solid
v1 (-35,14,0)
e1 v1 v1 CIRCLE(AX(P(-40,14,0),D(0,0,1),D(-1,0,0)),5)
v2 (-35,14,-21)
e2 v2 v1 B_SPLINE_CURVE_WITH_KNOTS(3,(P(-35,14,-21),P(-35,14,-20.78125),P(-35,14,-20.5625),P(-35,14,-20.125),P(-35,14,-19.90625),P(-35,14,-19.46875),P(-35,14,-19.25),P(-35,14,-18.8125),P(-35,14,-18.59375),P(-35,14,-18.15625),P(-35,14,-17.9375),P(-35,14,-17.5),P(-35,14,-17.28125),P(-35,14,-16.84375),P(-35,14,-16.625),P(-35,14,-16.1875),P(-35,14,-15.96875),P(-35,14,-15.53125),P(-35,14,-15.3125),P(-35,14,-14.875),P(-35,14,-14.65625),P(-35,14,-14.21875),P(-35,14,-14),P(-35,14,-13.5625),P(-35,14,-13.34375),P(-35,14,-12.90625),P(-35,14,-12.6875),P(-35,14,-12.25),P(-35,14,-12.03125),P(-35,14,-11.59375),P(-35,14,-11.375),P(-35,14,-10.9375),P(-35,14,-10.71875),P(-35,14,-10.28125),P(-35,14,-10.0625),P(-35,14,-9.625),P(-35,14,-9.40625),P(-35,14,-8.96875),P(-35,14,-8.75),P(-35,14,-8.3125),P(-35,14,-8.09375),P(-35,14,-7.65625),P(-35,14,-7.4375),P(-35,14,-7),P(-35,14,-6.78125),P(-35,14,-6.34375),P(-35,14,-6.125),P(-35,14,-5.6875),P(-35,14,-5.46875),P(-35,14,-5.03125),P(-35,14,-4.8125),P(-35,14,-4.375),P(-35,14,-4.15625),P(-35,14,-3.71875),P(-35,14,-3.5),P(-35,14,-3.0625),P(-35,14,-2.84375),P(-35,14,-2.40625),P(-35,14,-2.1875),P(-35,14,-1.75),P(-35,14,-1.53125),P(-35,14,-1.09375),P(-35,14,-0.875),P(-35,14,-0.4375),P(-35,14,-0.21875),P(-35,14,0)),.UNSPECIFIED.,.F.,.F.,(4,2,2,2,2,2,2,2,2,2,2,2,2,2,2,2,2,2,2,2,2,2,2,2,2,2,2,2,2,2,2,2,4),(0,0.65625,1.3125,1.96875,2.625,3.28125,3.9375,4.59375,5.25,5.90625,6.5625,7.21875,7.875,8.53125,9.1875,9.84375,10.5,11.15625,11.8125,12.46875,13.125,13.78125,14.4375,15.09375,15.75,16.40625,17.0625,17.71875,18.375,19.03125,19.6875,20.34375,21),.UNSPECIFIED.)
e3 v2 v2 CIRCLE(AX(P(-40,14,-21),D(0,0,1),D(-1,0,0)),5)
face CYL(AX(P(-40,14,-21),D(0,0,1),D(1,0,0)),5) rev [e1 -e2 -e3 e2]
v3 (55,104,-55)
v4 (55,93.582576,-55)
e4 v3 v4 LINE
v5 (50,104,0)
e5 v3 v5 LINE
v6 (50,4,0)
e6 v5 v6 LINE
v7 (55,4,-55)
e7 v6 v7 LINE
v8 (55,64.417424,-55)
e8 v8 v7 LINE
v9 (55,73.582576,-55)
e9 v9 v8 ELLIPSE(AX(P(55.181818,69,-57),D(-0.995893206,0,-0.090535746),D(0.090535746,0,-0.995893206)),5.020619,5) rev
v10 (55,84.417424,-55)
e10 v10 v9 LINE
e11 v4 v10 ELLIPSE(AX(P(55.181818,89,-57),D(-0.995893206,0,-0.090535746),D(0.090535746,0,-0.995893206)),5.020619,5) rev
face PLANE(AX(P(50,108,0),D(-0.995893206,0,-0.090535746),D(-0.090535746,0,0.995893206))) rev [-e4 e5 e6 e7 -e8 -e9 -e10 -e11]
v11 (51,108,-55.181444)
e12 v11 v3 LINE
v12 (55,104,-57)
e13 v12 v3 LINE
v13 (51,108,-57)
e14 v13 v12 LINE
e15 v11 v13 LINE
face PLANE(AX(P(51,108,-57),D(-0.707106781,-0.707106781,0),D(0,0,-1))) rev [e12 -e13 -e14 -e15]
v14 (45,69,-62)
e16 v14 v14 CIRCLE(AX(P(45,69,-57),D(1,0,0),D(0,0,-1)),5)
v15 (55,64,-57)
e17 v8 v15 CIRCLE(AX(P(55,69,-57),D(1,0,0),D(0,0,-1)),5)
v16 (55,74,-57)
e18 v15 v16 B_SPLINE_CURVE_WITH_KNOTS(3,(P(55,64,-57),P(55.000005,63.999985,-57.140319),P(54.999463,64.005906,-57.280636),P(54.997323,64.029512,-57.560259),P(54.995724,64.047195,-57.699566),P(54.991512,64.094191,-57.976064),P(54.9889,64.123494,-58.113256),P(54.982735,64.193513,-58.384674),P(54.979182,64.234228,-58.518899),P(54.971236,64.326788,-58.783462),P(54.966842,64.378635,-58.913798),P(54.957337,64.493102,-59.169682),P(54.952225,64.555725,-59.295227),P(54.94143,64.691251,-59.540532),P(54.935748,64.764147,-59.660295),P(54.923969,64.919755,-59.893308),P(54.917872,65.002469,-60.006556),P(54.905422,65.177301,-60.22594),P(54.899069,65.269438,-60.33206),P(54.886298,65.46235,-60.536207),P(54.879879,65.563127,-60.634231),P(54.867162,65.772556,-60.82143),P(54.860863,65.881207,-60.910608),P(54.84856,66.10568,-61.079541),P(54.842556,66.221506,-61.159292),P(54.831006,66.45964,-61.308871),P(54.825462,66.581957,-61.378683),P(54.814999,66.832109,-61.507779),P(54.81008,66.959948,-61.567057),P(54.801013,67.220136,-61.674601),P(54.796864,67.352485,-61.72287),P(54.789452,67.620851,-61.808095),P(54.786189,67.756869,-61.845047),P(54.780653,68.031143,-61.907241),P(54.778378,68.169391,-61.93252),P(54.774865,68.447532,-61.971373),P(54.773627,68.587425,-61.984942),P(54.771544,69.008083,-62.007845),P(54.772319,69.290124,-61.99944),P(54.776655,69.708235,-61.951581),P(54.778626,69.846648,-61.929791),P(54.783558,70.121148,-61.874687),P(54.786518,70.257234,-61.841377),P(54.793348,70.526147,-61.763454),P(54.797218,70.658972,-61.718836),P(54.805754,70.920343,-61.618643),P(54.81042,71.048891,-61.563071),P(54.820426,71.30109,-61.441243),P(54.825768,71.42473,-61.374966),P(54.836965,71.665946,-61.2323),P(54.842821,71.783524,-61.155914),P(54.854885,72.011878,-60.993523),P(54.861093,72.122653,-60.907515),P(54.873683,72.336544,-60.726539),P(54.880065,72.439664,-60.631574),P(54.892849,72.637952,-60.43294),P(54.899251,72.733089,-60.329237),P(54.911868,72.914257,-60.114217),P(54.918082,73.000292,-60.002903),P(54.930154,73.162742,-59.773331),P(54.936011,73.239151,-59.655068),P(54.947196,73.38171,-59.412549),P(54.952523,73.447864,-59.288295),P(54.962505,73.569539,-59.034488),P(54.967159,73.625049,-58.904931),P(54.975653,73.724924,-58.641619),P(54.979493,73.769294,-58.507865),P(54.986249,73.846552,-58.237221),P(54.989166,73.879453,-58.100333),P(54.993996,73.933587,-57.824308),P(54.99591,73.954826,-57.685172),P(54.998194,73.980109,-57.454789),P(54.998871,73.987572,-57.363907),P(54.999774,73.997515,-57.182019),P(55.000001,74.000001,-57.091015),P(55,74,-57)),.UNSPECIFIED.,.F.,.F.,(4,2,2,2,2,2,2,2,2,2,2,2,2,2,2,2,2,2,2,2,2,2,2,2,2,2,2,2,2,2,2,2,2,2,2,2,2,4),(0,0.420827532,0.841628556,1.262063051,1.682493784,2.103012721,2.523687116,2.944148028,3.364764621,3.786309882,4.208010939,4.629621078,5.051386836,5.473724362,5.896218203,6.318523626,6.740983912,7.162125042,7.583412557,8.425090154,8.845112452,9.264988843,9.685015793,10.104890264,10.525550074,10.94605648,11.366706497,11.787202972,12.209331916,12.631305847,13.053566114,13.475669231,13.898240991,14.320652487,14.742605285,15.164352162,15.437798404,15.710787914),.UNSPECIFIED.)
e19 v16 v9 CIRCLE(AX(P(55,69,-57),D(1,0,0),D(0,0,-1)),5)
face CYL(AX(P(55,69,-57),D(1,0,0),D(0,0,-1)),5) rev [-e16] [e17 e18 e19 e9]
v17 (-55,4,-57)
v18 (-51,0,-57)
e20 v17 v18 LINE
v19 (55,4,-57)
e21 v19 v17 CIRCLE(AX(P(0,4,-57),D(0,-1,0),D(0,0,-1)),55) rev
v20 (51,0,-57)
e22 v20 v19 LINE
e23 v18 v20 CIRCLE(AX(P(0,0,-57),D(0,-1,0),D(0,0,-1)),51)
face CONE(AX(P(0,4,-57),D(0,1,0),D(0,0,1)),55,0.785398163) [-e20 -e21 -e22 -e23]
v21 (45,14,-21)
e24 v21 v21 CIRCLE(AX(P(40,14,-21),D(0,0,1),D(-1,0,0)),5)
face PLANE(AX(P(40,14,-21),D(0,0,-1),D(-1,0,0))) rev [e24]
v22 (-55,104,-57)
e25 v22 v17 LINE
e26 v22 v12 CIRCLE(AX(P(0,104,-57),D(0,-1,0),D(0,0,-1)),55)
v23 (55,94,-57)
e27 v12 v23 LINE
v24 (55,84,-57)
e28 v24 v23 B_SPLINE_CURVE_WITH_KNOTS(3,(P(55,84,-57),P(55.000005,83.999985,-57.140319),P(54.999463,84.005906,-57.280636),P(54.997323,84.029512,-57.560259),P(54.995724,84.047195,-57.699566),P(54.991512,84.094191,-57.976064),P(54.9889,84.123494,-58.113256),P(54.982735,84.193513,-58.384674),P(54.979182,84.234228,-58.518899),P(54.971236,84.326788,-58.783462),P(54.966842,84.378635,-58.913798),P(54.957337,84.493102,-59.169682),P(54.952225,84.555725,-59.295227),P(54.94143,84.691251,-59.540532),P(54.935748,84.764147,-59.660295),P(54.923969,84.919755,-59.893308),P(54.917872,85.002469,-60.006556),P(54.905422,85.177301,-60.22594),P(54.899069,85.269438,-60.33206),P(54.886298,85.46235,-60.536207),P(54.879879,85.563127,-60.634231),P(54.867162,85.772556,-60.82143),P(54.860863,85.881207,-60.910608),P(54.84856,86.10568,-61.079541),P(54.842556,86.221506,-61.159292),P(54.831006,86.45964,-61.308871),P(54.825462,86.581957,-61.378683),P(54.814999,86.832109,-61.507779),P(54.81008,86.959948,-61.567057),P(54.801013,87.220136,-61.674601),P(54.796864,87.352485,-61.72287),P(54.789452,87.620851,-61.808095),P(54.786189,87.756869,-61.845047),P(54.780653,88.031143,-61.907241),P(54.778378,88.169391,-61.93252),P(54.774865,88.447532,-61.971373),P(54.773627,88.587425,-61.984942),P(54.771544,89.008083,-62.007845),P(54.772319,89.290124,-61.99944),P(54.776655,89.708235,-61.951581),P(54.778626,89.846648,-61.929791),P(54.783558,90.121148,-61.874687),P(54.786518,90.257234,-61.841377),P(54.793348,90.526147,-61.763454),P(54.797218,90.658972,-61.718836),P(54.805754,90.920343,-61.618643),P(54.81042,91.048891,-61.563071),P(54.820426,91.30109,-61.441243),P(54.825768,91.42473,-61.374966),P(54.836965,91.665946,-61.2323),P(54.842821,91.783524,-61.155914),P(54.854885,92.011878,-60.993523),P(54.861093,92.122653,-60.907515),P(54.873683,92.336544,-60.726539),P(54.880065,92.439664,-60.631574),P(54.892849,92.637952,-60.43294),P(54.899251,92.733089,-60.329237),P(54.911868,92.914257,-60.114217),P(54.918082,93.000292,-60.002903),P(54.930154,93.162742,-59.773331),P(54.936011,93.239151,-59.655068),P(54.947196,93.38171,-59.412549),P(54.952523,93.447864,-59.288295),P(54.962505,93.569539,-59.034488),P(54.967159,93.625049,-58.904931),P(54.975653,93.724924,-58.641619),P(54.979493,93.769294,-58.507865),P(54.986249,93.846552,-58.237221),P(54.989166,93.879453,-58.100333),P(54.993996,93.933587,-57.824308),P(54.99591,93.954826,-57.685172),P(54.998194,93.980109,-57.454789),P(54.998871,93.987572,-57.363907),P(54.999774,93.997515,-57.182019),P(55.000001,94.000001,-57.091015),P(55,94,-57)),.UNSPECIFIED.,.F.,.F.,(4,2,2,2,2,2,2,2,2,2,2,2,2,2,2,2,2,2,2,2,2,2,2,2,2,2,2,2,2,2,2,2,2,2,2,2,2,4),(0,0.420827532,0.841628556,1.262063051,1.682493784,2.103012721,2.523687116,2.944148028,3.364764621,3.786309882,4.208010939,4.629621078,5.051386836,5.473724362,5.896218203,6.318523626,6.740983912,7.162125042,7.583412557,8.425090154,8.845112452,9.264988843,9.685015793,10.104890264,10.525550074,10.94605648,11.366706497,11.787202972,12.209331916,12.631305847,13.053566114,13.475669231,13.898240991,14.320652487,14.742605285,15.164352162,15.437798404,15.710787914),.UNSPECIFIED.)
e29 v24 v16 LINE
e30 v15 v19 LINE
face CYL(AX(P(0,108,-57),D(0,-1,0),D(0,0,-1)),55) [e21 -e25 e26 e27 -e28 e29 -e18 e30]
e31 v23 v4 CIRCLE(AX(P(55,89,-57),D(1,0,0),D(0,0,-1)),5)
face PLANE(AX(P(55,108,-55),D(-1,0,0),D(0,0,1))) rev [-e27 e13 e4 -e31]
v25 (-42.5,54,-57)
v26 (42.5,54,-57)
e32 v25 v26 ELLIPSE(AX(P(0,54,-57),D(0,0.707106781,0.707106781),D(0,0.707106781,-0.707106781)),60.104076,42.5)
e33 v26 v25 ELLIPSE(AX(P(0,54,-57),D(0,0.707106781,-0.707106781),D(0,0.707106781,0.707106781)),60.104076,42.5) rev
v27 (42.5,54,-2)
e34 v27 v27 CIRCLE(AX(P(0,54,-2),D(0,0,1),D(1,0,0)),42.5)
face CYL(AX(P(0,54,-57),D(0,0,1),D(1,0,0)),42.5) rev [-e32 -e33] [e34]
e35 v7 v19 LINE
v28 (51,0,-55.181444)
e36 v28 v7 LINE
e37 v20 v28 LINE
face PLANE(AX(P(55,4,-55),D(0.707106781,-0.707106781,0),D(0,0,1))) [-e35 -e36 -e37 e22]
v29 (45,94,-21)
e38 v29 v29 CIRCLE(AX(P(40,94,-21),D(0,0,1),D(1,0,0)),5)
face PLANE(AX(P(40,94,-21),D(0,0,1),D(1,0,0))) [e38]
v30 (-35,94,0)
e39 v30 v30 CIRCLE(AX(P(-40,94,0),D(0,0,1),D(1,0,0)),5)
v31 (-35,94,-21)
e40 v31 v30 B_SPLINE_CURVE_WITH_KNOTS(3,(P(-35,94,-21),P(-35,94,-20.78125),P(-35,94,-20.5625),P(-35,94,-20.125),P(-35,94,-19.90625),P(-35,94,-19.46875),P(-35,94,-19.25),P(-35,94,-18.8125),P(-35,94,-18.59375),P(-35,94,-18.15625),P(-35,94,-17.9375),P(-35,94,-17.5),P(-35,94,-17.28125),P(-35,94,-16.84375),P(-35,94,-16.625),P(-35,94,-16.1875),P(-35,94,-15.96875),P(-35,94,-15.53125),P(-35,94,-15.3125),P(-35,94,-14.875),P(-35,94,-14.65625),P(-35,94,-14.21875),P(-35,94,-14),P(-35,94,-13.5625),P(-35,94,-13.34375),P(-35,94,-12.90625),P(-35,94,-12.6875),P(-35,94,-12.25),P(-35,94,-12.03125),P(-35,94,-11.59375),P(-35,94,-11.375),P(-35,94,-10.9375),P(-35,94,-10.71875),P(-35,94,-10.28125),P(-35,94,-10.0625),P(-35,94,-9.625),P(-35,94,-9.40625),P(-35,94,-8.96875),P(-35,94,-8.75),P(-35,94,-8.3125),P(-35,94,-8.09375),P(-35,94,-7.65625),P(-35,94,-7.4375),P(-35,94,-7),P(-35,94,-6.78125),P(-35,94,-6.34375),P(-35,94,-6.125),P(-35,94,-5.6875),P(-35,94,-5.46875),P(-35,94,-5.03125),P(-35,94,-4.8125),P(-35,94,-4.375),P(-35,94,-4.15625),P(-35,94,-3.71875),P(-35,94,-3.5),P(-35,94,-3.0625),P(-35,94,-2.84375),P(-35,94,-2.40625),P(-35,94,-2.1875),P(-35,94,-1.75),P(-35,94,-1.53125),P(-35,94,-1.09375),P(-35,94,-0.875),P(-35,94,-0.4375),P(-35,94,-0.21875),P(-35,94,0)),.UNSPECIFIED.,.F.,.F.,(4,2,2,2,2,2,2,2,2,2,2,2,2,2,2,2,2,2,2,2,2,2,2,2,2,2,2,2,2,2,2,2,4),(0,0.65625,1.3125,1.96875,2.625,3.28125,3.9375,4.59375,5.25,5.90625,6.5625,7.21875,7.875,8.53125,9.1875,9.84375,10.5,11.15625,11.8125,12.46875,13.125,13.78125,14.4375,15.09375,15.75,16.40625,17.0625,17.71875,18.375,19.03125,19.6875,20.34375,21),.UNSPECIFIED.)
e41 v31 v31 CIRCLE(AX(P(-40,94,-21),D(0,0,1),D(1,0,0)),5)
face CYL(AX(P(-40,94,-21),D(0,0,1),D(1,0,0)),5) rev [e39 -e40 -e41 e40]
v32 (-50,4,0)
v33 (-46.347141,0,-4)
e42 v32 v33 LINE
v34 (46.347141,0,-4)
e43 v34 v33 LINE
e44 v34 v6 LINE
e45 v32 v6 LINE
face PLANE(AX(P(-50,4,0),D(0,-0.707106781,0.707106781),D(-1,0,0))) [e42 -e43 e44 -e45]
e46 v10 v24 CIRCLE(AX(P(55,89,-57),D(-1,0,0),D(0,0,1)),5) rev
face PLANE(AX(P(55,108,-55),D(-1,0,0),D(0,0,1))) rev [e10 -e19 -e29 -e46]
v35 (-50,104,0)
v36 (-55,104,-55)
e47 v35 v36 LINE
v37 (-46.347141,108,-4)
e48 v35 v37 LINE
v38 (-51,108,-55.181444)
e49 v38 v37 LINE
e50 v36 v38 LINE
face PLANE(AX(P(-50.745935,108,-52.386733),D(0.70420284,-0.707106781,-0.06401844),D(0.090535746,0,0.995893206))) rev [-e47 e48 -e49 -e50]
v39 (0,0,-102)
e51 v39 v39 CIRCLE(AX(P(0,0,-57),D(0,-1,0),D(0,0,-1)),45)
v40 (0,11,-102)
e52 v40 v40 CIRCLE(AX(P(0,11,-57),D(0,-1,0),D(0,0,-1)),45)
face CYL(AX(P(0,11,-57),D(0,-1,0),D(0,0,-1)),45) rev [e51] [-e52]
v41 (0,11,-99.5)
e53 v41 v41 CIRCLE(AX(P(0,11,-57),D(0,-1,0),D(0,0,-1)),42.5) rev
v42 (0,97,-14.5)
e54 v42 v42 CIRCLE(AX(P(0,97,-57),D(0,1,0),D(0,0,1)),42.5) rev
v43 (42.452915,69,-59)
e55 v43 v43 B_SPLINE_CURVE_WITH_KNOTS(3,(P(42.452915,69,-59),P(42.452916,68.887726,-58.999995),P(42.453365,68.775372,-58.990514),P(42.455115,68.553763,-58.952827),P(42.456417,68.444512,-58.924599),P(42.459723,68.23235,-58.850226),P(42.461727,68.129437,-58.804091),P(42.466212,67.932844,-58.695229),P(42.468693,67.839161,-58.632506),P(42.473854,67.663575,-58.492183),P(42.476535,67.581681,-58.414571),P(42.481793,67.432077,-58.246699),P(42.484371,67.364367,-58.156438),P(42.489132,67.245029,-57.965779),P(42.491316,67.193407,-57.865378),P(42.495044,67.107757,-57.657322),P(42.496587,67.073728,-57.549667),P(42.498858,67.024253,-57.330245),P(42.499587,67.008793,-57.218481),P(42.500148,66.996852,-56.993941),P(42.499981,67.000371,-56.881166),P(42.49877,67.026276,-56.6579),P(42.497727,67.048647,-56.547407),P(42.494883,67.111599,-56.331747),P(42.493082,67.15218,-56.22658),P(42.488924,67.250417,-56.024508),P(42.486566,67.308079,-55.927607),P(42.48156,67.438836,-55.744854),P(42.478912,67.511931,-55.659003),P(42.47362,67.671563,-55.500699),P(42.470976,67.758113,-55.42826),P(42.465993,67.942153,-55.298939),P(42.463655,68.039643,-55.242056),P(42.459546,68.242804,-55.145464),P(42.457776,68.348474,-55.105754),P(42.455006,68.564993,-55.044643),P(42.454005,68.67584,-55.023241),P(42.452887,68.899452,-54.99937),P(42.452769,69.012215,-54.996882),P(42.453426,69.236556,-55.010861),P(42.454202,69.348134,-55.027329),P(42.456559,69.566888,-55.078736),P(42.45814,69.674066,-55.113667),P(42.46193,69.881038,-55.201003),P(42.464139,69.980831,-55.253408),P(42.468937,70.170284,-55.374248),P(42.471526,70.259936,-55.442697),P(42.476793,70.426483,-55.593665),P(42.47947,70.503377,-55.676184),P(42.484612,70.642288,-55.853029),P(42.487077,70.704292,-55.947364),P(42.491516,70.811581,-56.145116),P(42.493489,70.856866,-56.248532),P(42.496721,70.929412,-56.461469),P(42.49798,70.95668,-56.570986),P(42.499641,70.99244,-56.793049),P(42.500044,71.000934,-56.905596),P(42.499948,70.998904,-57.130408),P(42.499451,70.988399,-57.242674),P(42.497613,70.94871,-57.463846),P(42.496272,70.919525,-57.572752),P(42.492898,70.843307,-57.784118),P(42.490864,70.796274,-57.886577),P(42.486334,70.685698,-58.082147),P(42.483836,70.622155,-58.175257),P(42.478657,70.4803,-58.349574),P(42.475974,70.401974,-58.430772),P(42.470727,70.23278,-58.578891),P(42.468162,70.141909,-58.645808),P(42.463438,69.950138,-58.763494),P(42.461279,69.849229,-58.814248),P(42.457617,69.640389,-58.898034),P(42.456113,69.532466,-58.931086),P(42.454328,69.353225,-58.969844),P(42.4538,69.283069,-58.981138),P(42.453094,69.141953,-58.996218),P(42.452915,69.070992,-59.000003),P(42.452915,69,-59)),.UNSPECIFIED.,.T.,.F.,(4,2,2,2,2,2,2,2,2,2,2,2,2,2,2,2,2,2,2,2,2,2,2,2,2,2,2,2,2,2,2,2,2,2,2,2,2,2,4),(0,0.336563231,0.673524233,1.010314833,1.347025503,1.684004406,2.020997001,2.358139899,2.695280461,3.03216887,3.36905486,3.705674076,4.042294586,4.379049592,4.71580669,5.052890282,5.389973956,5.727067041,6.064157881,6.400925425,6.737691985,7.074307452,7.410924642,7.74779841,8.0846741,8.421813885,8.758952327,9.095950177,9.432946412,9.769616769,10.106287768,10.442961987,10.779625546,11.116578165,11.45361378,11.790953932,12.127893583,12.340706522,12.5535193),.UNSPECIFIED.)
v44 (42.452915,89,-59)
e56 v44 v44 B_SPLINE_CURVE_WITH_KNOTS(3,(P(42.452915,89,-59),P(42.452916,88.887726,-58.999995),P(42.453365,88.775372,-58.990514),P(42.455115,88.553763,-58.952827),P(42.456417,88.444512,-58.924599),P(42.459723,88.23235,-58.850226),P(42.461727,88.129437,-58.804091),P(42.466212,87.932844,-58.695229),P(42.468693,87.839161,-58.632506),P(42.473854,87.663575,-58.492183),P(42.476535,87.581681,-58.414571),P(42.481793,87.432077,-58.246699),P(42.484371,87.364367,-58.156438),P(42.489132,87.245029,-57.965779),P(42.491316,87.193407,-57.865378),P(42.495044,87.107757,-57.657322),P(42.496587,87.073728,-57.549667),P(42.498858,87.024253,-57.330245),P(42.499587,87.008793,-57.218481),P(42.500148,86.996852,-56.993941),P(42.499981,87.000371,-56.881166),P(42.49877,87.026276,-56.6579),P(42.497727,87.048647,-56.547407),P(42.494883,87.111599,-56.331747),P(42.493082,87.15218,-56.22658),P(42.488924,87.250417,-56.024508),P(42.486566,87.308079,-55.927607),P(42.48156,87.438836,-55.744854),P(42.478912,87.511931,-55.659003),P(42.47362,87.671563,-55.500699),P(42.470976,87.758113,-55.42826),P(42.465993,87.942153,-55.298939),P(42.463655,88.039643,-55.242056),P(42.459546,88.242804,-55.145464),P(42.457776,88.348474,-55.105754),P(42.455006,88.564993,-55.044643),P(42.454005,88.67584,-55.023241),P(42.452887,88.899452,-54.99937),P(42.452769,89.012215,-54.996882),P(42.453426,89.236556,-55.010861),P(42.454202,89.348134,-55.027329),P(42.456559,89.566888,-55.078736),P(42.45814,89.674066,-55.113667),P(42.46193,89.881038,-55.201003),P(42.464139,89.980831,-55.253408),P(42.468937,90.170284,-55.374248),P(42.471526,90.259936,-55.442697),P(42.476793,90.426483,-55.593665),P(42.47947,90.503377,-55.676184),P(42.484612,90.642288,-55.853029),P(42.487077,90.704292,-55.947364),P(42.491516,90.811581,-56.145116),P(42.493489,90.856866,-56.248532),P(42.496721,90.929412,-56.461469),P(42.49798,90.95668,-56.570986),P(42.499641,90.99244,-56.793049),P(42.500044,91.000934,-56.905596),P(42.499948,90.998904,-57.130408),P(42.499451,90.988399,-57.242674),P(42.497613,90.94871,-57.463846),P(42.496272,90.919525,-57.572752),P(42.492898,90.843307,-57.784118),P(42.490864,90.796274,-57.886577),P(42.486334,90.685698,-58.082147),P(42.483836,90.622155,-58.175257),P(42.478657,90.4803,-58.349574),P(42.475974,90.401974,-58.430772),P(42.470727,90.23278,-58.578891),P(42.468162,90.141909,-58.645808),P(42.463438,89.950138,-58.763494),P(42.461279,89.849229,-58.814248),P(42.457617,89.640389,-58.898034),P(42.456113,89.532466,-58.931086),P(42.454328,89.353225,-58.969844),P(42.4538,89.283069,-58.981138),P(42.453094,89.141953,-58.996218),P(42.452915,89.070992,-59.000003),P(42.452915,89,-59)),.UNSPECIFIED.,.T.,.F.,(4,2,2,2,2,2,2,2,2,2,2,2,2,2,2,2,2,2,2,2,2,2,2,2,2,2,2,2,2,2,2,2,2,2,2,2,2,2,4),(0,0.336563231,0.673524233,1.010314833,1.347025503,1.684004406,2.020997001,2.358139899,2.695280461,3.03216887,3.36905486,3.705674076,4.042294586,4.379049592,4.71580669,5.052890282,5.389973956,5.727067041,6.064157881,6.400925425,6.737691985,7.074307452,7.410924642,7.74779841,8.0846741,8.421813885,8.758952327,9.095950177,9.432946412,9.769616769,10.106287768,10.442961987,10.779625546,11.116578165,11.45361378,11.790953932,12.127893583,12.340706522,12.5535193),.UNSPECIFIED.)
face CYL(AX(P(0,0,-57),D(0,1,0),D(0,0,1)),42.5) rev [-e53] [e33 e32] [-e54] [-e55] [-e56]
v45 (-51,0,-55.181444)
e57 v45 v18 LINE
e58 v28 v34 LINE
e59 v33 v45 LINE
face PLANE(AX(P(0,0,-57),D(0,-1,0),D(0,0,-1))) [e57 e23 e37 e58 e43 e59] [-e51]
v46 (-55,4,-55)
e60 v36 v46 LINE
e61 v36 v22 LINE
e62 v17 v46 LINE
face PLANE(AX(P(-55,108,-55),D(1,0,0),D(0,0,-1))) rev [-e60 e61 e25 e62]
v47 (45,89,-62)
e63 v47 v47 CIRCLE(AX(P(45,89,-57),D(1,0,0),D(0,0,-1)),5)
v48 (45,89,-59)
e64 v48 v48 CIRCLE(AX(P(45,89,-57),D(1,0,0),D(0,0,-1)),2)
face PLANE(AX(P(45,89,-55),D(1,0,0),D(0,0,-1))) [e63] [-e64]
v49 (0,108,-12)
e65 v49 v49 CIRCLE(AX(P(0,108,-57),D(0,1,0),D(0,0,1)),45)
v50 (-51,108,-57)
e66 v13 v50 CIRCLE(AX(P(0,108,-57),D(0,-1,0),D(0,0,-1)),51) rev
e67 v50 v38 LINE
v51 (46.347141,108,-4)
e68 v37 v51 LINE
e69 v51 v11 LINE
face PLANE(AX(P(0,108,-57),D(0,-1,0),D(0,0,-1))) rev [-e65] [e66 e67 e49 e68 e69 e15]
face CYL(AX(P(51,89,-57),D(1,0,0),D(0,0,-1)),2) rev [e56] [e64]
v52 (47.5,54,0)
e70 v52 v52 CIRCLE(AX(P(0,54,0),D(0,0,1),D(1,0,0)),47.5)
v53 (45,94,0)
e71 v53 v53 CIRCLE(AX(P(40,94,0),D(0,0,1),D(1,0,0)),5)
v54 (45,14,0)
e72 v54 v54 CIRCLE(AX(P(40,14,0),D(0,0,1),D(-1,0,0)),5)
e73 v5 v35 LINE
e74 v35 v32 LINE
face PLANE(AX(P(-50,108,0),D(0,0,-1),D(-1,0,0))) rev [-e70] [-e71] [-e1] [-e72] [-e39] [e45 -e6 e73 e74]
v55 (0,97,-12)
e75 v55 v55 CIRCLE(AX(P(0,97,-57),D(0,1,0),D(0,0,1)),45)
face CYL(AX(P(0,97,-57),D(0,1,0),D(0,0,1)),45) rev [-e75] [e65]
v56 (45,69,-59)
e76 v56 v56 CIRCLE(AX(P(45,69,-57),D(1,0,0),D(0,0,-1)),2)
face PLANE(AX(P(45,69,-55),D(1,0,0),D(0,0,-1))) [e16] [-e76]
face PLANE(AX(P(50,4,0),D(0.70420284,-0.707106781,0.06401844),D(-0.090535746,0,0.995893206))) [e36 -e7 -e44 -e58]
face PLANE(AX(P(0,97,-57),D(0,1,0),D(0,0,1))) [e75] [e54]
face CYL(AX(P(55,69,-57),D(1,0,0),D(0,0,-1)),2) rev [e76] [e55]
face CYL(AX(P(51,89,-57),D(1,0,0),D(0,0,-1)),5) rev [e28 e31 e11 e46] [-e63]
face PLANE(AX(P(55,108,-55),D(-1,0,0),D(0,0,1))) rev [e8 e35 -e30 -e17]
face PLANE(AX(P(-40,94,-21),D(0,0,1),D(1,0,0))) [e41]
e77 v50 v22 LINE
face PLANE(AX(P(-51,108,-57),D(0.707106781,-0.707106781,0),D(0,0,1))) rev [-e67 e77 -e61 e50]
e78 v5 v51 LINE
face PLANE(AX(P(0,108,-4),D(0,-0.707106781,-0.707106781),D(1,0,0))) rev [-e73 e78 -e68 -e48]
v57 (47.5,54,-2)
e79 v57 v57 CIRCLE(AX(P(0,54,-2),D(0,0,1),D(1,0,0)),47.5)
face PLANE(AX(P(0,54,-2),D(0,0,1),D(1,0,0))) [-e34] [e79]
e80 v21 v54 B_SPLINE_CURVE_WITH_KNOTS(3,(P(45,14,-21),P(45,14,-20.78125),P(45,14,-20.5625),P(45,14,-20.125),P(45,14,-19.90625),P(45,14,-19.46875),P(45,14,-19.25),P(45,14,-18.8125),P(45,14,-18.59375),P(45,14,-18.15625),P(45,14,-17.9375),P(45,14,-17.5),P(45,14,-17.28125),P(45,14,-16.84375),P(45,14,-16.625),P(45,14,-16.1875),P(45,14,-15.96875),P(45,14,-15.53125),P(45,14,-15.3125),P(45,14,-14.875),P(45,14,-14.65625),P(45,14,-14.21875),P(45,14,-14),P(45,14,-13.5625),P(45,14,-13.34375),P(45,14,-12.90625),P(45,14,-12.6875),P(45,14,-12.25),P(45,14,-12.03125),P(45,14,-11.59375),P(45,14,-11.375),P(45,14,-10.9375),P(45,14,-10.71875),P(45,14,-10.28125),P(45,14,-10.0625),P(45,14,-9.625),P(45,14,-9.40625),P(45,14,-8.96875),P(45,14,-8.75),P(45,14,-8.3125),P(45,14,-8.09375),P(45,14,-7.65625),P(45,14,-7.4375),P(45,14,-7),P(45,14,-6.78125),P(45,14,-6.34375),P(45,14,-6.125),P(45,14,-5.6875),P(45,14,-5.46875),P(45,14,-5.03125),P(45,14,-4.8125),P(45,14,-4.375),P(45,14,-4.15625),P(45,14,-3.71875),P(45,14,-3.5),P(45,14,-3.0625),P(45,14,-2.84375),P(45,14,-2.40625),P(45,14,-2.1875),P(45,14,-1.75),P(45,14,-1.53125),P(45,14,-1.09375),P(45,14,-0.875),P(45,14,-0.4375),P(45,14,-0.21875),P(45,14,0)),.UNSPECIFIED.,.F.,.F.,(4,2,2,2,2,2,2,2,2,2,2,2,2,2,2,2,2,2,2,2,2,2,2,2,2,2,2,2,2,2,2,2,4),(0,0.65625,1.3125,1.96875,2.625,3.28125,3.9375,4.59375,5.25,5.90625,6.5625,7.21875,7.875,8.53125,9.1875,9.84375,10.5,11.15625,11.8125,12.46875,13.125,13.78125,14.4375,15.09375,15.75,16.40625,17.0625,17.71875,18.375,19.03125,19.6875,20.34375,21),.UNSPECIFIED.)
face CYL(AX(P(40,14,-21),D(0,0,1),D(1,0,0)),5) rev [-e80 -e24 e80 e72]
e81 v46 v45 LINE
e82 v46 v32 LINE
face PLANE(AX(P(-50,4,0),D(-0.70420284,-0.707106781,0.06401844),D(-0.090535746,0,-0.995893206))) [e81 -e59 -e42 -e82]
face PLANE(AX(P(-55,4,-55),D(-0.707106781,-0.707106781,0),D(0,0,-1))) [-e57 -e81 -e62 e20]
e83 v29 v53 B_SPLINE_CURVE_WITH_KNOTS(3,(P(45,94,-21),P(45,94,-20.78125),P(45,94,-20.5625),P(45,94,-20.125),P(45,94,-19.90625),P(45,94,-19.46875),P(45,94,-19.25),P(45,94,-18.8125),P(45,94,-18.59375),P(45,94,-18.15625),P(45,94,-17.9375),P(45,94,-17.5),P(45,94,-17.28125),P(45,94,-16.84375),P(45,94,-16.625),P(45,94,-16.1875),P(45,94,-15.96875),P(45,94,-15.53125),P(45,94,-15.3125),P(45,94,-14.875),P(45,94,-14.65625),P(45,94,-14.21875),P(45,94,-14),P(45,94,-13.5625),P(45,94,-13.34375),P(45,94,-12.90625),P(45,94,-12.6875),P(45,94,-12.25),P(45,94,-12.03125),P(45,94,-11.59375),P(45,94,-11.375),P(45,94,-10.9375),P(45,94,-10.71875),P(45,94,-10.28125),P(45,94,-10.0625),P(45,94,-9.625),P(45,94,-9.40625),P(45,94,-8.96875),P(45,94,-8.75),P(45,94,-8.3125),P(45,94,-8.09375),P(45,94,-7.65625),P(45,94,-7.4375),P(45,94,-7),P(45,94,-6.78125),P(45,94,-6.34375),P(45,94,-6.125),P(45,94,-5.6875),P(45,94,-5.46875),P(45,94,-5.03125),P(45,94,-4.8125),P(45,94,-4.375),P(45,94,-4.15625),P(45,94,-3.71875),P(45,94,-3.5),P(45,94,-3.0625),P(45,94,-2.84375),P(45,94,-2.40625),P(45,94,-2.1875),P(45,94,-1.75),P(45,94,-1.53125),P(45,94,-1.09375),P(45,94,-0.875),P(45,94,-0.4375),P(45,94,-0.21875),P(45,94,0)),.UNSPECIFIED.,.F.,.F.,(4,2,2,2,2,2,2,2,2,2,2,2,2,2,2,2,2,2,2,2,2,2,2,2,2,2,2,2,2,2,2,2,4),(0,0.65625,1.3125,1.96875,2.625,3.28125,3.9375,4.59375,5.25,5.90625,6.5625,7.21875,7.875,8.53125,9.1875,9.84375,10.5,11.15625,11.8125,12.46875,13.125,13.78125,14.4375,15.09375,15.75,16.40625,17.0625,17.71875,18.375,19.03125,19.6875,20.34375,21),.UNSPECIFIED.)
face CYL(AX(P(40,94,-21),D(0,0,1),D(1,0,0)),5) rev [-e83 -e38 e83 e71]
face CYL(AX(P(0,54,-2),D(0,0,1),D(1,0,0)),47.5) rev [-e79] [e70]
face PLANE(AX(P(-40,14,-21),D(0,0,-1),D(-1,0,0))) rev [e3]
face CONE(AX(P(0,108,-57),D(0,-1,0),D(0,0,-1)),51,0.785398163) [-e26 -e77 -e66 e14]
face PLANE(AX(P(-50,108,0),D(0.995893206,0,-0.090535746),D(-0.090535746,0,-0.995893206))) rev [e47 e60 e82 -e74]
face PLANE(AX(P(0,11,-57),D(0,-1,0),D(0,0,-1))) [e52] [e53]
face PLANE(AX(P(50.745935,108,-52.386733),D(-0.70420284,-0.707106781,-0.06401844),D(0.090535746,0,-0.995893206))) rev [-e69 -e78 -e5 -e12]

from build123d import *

# Parameters (mm, degrees)
EXTRUDE_2_DEPTH     = 108
CHAMFER_2_SIZE      = 4
SKETCH_3_R          = 42.5
CUT_EXTRUDE_1_DEPTH = 166.024240644
SKETCH_4_R          = 45
CUT_EXTRUDE_2_DEPTH = 11
CUT_EXTRUDE_START   = -11
SKETCH_5_R          = 45
CUT_EXTRUDE_3_DEPTH = 11
SKETCH_6_R          = 5
CUT_EXTRUDE_4_DEPTH = 21
SKETCH_10_R         = 47.5
CUT_EXTRUDE_5_DEPTH = 2
SKETCH_11_R         = 42.5
CUT_EXTRUDE_6_DEPTH = 55


with BuildPart() as part:
    # 草图2 → 凸台-拉伸2 (new body)
    with BuildSketch(Plane(origin=(0, 0, 0), x_dir=(1, 0, 0), z_dir=(0, 1, 0))):
        with BuildLine():
            Line((-50, 0), (50, 0))
            Line((50, 0), (55, 55))
            Line((55, 55), (55, 57))
            ThreePointArc((55, 57), (0, 112), (-55, 57))
            Line((-55, 57), (-55, 55))
            Line((-55, 55), (-50, 0))
        make_face()
    extrude(amount=EXTRUDE_2_DEPTH)

    # 倒角2
    # the kernel refuses this chamfer: 4 mm, written as the material it takes off along each edge
    with BuildSketch(Plane(origin=(-55.931316952, 108, -65.244486468), x_dir=(-0.02738295672235633, -0.9996219169112968, 0.00248935970203239), z_dir=(0.0905357460425184, 0, 0.9958932064677039)), Plane(origin=(49.068683048, 108, 10.244486468), x_dir=(0.027382956722356445, -0.9996219169112968, 0.0024893597020324005), z_dir=(0.0905357460425184, 0, -0.9958932064677039))) as chamfer_2_piece_1:
        Polygon((CHAMFER_2_SIZE * 0.999621916911, CHAMFER_2_SIZE * 0.0274958766106), (-CHAMFER_2_SIZE * 0.0274958766106, CHAMFER_2_SIZE * 0.999621916911), (0, 0), align=None)
    extrude(amount=75.80026899, mode=Mode.SUBTRACT)
    with BuildSketch(Plane(origin=(-60.286731952, 108, 0), x_dir=(0, -0.9996219169112968, 0.02749587661058639), z_dir=(1, 0, 0))) as chamfer_2_piece_2:
        Polygon((CHAMFER_2_SIZE * 0.999621916911, CHAMFER_2_SIZE * 0.0274958766106), (-CHAMFER_2_SIZE * 0.0274958766106, CHAMFER_2_SIZE * 0.999621916911), (0, 0), align=None)
    extrude(amount=120.573463904, mode=Mode.SUBTRACT)
    with BuildSketch(Plane(origin=(55, 108, -44.713268048), x_dir=(0.027495876610585647, -0.9996219169112968, 0), z_dir=(0, 0, -1)), Plane(origin=(-55, 108, -57), x_dir=(-0.027495876610585647, -0.9996219169112968, 0), z_dir=(0, 0, 1))) as chamfer_2_piece_3:
        Polygon((CHAMFER_2_SIZE * 0.999621916911, CHAMFER_2_SIZE * 0.0274958766106), (-CHAMFER_2_SIZE * 0.0274958766106, CHAMFER_2_SIZE * 0.999621916911), (0, 0), align=None)
    extrude(amount=12.286731952, mode=Mode.SUBTRACT)
    with BuildSketch(Plane(origin=(0, 108, -57), x_dir=(1, 0, 0), z_dir=(0, 0, 1))) as chamfer_2_piece_4:
        Polygon((55, -CHAMFER_2_SIZE), (55 - CHAMFER_2_SIZE, 0), (55, 0), align=None)
    revolve(axis=Axis((0, 108, -57), (0, 1, 0)), revolution_arc=180, mode=Mode.SUBTRACT)
    with BuildSketch(Plane(origin=(55, 0, -44.713268048), x_dir=(0.02749587661058563, 0.9996219169112968, 0), z_dir=(0, 0, -1)), Plane(origin=(-55, 0, -57), x_dir=(-0.02749587661058563, 0.9996219169112968, 0), z_dir=(0, 0, 1))) as chamfer_2_piece_5:
        Polygon((CHAMFER_2_SIZE * 0.999621916911, -CHAMFER_2_SIZE * 0.0274958766106), (-CHAMFER_2_SIZE * 0.0274958766106, -CHAMFER_2_SIZE * 0.999621916911), (0, 0), align=None)
    extrude(amount=12.286731952, mode=Mode.SUBTRACT)
    with BuildSketch(Plane(origin=(49.068683048, 0, 10.244486468), x_dir=(0.027382956722356428, 0.9996219169112968, 0.0024893597020323992), z_dir=(0.0905357460425184, 0, -0.9958932064677039)), Plane(origin=(-55.931316952, 0, -65.244486468), x_dir=(-0.027382956722356314, 0.9996219169112968, 0.0024893597020323884), z_dir=(0.0905357460425184, 0, 0.9958932064677039))) as chamfer_2_piece_6:
        Polygon((CHAMFER_2_SIZE * 0.999621916911, -CHAMFER_2_SIZE * 0.0274958766106), (-CHAMFER_2_SIZE * 0.0274958766106, -CHAMFER_2_SIZE * 0.999621916911), (0, 0), align=None)
    extrude(amount=75.80026899, mode=Mode.SUBTRACT)
    with BuildSketch(Plane(origin=(-60.286731952, 0, 0), x_dir=(0, 0.9996219169112968, 0.027495876610586372), z_dir=(1, 0, 0))) as chamfer_2_piece_7:
        Polygon((CHAMFER_2_SIZE * 0.999621916911, -CHAMFER_2_SIZE * 0.0274958766106), (-CHAMFER_2_SIZE * 0.0274958766106, -CHAMFER_2_SIZE * 0.999621916911), (0, 0), align=None)
    extrude(amount=120.573463904, mode=Mode.SUBTRACT)
    with BuildSketch(Plane(origin=(0, 0, -57), x_dir=(1, 0, 0), z_dir=(0, 0, 1))) as chamfer_2_piece_8:
        Polygon((55, CHAMFER_2_SIZE), (55 - CHAMFER_2_SIZE, 0), (55, 0), align=None)
    revolve(axis=Axis((0, 0, -57), (0, 1, 0)), revolution_arc=180, mode=Mode.SUBTRACT)

    # 草图3 → 切除-拉伸1 (cut, through all)
    with BuildSketch(Plane(origin=(0, 108, 0), x_dir=(1, 0, 0), z_dir=(0, 1, 0))):
        with Locations(Location((0, 57, 0), (0, 0, 270))):
            Circle(SKETCH_3_R)
    extrude(amount=-CUT_EXTRUDE_1_DEPTH, mode=Mode.SUBTRACT)

    # 草图4 → 切除-拉伸2 (cut)
    with BuildSketch(Plane(origin=(0, 108, 0), x_dir=(1, 0, 0), z_dir=(0, 1, 0))):
        with Locations(Location((0, 57, 0), (0, 0, 270))):
            Circle(SKETCH_4_R)
    extrude(amount=-CUT_EXTRUDE_2_DEPTH, mode=Mode.SUBTRACT)

    # 草图5 → 切除-拉伸3 (cut)
    with BuildSketch(Plane.XZ.offset(CUT_EXTRUDE_START)):
        with Locations(Location((0, -57, 0), (0, 0, 90))):
            Circle(SKETCH_5_R)
    extrude(amount=CUT_EXTRUDE_3_DEPTH, mode=Mode.SUBTRACT)

    # 草图6 → 切除-拉伸4 (cut)
    with BuildSketch(Plane.XY):
        with Locations((40, 94)):
            Circle(SKETCH_6_R)
        with Locations((-40, 94)):
            Circle(SKETCH_6_R)
        with Locations((-40, 14)):
            Circle(SKETCH_6_R)
        with Locations((40, 14)):
            Circle(SKETCH_6_R)
    extrude(amount=-CUT_EXTRUDE_4_DEPTH, mode=Mode.SUBTRACT)

    # 草图8 → 切除-旋转2 (revolve, cut)
    with BuildSketch(Plane(origin=(0, 89, 0), x_dir=(1, 0, 0), z_dir=(0, 1, 0)), mode=Mode.PRIVATE) as cut_revolve_2_sk:
        Polygon((55, 57), (25, 57), (25, 55), (45, 55), (45, 52), (55, 52), align=None)
    revolve(cut_revolve_2_sk.sketch.rotate(Axis((51, 89, -57), (-1, 0, 0)), 180), axis=Axis((51, 89, -57), (-1, 0, 0)), mode=Mode.SUBTRACT)

    # 草图9 → 切除-旋转3 (revolve, cut)
    with BuildSketch(Plane(origin=(0, 69, 0), x_dir=(1, 0, 0), z_dir=(0, 1, 0)), mode=Mode.PRIVATE) as cut_revolve_3_sk:
        Polygon((55, 57), (25, 57), (25, 55), (45, 55), (45, 52), (55, 52), align=None)
    revolve(cut_revolve_3_sk.sketch.rotate(Axis((55, 69, -57), (-1, 0, 0)), 180), axis=Axis((55, 69, -57), (-1, 0, 0)), mode=Mode.SUBTRACT)

    # 草图10 → 切除-拉伸5 (cut)
    with BuildSketch(Plane.XY):
        with Locations((0, 54)):
            Circle(SKETCH_10_R)
    extrude(amount=-CUT_EXTRUDE_5_DEPTH, mode=Mode.SUBTRACT)

    # 草图11 → 切除-拉伸6 (cut)
    with BuildSketch(Plane.XY.offset(-2)):
        with Locations((0, 54)):
            Circle(SKETCH_11_R)
    extrude(amount=-CUT_EXTRUDE_6_DEPTH, mode=Mode.SUBTRACT)


solid = part.part
